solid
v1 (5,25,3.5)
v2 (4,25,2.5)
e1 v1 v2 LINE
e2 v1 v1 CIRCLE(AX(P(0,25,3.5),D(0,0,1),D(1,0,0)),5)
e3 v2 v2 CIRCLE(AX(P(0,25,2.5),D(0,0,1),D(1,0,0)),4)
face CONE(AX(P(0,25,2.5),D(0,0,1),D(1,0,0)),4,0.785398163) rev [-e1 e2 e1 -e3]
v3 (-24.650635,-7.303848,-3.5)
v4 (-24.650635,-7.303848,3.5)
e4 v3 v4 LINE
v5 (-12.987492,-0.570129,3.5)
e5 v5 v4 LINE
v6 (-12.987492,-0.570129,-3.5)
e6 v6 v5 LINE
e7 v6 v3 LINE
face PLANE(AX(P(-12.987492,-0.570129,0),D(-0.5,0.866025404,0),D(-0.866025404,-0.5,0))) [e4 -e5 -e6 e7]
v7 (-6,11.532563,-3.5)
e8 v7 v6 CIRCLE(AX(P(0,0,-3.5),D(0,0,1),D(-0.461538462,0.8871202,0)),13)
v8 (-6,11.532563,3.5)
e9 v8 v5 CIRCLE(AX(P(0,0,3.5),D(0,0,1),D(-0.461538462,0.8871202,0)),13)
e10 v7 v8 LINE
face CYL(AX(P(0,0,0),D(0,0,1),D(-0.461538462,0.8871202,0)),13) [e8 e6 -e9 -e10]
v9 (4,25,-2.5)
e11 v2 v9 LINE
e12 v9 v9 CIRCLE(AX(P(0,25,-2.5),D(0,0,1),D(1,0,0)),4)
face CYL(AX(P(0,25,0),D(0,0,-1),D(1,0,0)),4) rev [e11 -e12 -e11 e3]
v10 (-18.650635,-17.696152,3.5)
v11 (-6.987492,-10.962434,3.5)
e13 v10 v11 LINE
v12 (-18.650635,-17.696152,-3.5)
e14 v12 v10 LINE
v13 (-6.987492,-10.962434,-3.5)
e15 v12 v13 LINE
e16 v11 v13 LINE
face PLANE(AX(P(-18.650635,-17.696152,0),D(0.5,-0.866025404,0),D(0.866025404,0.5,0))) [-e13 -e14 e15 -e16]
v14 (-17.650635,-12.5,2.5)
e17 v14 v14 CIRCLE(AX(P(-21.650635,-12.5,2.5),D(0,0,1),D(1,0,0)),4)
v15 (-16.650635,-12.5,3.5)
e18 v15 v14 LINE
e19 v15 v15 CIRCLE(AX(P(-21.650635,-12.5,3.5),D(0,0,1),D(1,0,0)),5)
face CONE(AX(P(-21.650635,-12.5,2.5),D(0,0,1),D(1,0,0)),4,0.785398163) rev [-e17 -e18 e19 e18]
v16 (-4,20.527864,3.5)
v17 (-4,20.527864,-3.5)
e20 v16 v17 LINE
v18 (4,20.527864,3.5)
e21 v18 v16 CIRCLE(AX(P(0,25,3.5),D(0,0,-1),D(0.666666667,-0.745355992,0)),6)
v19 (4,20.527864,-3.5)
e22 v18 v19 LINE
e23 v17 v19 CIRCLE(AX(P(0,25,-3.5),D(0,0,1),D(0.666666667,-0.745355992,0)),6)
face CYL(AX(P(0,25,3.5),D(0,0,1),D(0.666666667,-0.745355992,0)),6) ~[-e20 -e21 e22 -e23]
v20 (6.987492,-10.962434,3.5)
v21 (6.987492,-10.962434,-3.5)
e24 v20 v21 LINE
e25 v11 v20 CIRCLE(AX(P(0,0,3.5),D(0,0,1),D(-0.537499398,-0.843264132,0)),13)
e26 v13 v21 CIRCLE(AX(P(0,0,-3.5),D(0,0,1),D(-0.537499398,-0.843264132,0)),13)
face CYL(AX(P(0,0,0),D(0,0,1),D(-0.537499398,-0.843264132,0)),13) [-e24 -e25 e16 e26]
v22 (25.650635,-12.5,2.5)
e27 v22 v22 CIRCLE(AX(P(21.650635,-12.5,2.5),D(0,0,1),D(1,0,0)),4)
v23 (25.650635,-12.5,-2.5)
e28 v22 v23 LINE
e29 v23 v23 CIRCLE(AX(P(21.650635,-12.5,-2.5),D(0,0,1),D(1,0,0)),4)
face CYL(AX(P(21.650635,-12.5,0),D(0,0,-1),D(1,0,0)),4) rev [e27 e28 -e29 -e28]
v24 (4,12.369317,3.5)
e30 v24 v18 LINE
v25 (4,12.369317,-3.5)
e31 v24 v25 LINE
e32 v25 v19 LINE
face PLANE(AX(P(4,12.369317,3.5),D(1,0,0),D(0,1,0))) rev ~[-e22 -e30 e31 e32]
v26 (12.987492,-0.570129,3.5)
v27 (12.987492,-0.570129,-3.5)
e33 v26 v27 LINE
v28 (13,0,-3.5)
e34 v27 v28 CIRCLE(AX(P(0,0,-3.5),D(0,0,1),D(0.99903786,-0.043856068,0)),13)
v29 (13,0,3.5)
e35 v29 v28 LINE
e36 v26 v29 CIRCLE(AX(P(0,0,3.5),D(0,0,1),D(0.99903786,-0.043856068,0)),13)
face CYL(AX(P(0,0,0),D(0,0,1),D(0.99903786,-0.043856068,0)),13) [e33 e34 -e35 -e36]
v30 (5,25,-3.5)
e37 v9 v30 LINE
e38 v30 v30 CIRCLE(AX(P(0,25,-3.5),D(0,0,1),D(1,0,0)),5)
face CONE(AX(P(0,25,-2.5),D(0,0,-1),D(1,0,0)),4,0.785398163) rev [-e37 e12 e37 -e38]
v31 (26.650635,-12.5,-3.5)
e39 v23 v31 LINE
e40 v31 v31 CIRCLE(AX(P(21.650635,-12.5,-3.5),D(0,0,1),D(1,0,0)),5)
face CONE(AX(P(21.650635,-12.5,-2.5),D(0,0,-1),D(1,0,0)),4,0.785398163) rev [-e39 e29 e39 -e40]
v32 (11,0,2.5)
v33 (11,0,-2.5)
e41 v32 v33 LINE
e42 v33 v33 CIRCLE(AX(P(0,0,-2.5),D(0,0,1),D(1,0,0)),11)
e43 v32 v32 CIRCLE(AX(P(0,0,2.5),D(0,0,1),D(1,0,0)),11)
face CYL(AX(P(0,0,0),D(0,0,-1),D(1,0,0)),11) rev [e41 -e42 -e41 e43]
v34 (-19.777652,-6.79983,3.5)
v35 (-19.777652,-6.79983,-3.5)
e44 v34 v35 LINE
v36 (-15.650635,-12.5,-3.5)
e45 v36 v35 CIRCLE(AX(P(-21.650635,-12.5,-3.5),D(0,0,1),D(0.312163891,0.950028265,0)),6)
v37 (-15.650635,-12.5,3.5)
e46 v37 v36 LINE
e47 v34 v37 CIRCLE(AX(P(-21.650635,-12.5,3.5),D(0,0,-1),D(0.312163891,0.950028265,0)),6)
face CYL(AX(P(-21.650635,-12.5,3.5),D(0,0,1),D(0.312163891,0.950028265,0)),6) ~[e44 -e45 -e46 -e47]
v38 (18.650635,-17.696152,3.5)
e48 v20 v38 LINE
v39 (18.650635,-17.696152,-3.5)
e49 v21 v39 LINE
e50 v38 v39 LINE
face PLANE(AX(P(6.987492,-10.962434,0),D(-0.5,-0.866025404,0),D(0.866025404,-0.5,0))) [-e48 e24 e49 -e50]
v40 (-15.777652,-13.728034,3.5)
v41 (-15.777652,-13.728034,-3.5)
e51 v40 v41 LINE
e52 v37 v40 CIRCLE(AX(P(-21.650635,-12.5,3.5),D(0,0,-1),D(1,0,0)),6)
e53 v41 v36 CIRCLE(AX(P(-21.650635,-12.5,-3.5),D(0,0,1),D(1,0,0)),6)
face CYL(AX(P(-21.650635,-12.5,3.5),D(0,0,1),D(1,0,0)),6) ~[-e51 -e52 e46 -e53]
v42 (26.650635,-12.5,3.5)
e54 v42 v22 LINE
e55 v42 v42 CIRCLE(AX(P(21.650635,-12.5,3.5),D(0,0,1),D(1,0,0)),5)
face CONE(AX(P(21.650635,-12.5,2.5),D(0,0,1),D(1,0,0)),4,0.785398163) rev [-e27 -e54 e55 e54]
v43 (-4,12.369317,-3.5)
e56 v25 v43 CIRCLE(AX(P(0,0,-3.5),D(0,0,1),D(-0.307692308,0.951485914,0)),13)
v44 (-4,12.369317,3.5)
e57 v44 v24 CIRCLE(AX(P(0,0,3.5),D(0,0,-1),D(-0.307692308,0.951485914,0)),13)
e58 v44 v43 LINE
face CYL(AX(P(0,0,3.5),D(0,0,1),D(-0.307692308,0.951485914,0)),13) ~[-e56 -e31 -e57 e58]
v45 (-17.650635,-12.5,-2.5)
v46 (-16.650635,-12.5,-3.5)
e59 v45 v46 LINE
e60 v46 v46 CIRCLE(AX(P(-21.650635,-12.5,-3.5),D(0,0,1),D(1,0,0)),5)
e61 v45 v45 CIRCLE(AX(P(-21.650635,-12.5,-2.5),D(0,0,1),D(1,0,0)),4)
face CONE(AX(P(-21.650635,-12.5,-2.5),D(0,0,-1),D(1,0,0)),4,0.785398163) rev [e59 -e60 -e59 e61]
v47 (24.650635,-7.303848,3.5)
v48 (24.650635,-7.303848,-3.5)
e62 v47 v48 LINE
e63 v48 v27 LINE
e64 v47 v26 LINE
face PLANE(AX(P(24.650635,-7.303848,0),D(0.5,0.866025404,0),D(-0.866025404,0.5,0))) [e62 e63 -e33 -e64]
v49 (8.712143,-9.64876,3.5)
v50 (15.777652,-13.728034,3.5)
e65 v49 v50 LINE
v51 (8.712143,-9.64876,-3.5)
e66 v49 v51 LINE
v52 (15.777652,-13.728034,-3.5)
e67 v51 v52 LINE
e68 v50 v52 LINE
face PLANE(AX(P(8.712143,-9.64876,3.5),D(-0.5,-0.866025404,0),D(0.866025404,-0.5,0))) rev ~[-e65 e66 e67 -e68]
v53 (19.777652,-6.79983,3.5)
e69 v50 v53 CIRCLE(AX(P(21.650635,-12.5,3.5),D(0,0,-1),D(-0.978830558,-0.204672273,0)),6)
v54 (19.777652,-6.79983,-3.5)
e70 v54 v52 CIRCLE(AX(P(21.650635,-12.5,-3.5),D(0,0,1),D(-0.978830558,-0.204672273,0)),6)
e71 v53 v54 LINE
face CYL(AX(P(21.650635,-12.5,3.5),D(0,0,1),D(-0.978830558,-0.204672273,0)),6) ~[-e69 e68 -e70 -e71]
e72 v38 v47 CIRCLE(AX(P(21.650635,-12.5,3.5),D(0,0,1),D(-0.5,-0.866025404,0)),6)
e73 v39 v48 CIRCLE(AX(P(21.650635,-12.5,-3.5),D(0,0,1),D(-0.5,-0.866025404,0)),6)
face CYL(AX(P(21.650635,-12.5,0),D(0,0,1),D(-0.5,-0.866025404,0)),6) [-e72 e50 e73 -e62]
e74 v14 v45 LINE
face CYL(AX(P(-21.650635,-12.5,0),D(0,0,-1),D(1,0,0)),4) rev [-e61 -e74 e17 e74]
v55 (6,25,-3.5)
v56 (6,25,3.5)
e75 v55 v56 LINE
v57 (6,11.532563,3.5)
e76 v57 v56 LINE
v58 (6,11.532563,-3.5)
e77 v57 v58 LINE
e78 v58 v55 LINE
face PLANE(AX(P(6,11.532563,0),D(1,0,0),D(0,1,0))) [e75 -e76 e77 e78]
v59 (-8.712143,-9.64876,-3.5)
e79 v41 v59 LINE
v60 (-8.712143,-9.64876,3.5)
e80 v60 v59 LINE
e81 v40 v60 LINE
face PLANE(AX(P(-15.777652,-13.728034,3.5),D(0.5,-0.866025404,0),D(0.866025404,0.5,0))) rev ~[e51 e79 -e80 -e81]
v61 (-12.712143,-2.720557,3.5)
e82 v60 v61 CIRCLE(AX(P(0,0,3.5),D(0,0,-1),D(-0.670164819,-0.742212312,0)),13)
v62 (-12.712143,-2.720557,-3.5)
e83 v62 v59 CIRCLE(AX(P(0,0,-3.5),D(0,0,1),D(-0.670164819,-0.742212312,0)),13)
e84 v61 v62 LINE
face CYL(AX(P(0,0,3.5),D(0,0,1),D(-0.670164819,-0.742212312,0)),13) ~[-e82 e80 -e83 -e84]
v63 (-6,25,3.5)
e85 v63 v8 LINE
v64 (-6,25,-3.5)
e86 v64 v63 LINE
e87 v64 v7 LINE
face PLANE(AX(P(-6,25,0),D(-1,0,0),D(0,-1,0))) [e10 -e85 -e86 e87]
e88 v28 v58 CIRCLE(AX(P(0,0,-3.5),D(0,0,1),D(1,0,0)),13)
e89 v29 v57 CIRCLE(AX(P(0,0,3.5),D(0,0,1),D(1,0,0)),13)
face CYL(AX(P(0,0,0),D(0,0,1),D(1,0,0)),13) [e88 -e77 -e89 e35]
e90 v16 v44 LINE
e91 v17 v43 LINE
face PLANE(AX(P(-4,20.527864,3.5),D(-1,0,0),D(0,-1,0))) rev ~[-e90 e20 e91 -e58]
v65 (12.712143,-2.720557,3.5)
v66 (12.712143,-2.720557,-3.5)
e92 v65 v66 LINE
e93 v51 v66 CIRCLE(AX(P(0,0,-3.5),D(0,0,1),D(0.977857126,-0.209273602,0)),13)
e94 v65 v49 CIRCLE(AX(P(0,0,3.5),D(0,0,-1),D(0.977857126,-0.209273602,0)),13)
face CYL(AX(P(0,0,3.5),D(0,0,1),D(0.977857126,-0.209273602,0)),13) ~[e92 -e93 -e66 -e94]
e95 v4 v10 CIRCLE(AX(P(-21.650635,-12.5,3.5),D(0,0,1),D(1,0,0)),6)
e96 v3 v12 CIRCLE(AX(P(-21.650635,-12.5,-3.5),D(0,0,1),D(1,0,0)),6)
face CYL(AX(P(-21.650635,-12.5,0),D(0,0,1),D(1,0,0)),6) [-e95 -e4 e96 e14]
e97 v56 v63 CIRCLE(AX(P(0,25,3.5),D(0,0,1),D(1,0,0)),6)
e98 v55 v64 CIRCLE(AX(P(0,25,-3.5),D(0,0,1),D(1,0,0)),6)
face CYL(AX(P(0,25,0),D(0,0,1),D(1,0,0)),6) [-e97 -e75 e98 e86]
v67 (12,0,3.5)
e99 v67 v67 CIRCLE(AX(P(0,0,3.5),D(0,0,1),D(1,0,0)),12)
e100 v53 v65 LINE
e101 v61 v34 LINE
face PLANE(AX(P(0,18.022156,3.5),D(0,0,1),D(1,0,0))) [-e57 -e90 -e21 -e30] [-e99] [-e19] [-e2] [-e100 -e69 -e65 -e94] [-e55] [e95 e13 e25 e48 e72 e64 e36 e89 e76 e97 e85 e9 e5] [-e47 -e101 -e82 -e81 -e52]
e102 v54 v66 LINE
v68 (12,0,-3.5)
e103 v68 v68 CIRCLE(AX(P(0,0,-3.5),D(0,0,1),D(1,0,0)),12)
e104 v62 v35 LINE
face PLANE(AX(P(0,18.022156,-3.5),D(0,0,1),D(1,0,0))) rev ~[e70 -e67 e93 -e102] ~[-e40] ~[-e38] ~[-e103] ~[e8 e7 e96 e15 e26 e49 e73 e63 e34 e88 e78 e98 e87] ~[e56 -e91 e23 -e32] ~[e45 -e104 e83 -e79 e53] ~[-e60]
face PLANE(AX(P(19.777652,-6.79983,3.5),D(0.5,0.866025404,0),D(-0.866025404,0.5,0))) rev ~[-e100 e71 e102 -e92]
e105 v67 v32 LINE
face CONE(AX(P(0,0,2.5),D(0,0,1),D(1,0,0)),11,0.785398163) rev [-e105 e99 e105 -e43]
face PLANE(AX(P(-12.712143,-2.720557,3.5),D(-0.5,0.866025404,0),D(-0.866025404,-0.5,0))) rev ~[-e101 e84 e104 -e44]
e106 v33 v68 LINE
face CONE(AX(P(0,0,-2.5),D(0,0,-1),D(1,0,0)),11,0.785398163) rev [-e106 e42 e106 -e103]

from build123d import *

# Parameters (mm, degrees)
F0_R     = 11
F0_R_2   = 4
F1_DEPTH = 3.5
F2_SIZE  = 1
F4_DEPTH = 7.001


# Not quite as in the source:
# - a feature names something its author has since deleted; it is built from what else it names


with BuildPart() as f1:
    # F0 (on Top) → F1 (new body, symmetric)
    with BuildSketch(Plane.XY):
        with BuildLine():
            ThreePointArc((-6, 11.5325625947), (0, 13), (6, 11.5325625947))
            Line((6, 11.5325625947), (6, 25))
            ThreePointArc((6, 25), (0, 19), (-6, 25))
            Line((-6, 25), (-6, 11.5325625947))
        make_face()
        with BuildLine():
            ThreePointArc((-6.9874921777, -10.96243372), (-11.2583302492, -6.5), (-12.9874921777, -0.5701288746))
            Line((-12.9874921777, -0.5701288746), (-24.6506350946, -7.3038475773))
            ThreePointArc((-24.6506350946, -7.3038475773), (-18.6506350946, -7.3038475773), (-15.6506350946, -12.5))
            ThreePointArc((-15.6506350946, -12.5), (-16.4544826719, -15.5), (-18.6506350946, -17.6961524227))
            Line((-18.6506350946, -17.6961524227), (-6.9874921777, -10.96243372))
        make_face()
        with BuildLine():
            Line((24.6506350946, -7.3038475773), (12.9874921777, -0.5701288746))
            ThreePointArc((12.9874921777, -0.5701288746), (11.2583302492, -6.5), (6.9874921777, -10.96243372))
            Line((6.9874921777, -10.96243372), (18.6506350946, -17.6961524227))
            ThreePointArc((18.6506350946, -17.6961524227), (16.4544826719, -9.5), (24.6506350946, -7.3038475773))
        make_face()
        with BuildLine():
            ThreePointArc((12.9874921777, -0.5701288746), (12.9968726683, -0.2851330301), (13, 0))
            ThreePointArc((13, 0), (11.1130553854, 6.7453687816), (6, 11.5325625947))
            ThreePointArc((6, 11.5325625947), (0, 13), (-6, 11.5325625947))
            ThreePointArc((-6, 11.5325625947), (-11.2583302492, 6.5), (-12.9874921777, -0.5701288746))
            ThreePointArc((-12.9874921777, -0.5701288746), (-11.2583302492, -6.5), (-6.9874921777, -10.96243372))
            ThreePointArc((-6.9874921777, -10.96243372), (0, -13), (6.9874921777, -10.96243372))
            ThreePointArc((6.9874921777, -10.96243372), (11.2583302492, -6.5), (12.9874921777, -0.5701288746))
        make_face()
        Circle(F0_R, mode=Mode.SUBTRACT)
        with BuildLine():
            ThreePointArc((-6, 25), (0, 19), (6, 25))
            ThreePointArc((6, 25), (0, 31), (-6, 25))
        make_face()
        with Locations((0, 25)):
            Circle(F0_R_2, mode=Mode.SUBTRACT)
        with BuildLine():
            ThreePointArc((-15.6506350946, -12.5), (-18.6506350946, -7.3038475773), (-24.6506350946, -7.3038475773))
            ThreePointArc((-24.6506350946, -7.3038475773), (-26.8467875173, -15.5), (-18.6506350946, -17.6961524227))
            ThreePointArc((-18.6506350946, -17.6961524227), (-16.4544826719, -15.5), (-15.6506350946, -12.5))
        make_face()
        with Locations((-21.6506350946, -12.5)):
            Circle(F0_R_2, mode=Mode.SUBTRACT)
        with BuildLine():
            ThreePointArc((27.6506350946, -12.5), (26.8467875173, -9.5), (24.6506350946, -7.3038475773))
            ThreePointArc((24.6506350946, -7.3038475773), (16.4544826719, -9.5), (18.6506350946, -17.6961524227))
            ThreePointArc((18.6506350946, -17.6961524227), (24.6506350946, -17.6961524227), (27.6506350946, -12.5))
        make_face()
        with Locations((21.6506350946, -12.5)):
            Circle(F0_R_2, mode=Mode.SUBTRACT)
    extrude(amount=F1_DEPTH, both=True)

    # F2
    f2_edges = [f1.edges().sort_by_distance(p)[0] for p in [
        (-4, 25, 3.5),
        (-11, 0, 3.5),
        (-25.650635, -12.5, 3.5),
        (17.650635, -12.5, 3.5),
        (-25.650635, -12.5, -3.5),
        (-11, 0, -3.5),
        (17.650635, -12.5, -3.5),
        (-4, 25, -3.5),
    ]]
    chamfer(f2_edges, length=F2_SIZE)

    # F3 (on face) → F4 (cut, through all)
    with BuildSketch(Plane.XY.offset(3.5)):
        with BuildLine():
            Line((4, 12.3693168769), (4, 20.527864045))
            ThreePointArc((4, 20.527864045), (0, 19), (-4, 20.527864045))
            Line((-4, 20.527864045), (-4, 12.3693168769))
            ThreePointArc((-4, 12.3693168769), (0, 13), (4, 12.3693168769))
        make_face()
        with BuildLine():
            ThreePointArc((-8.7121426428, -9.6487600536), (-11.2583302492, -6.5), (-12.7121426428, -2.7205568233))
            Line((-12.7121426428, -2.7205568233), (-19.7776517484, -6.7998304074))
            ThreePointArc((-19.7776517484, -6.7998304074), (-16.7907019635, -8.9813283811), (-15.6506350946, -12.5))
            ThreePointArc((-15.6506350946, -12.5), (-15.682473733, -13.117292444), (-15.7776517484, -13.7280336376))
            Line((-15.7776517484, -13.7280336376), (-8.7121426428, -9.6487600536))
        make_face()
        with BuildLine():
            Line((19.7776517484, -6.7998304074), (12.7121426428, -2.7205568233))
            ThreePointArc((12.7121426428, -2.7205568233), (11.2583302492, -6.5), (8.7121426428, -9.6487600536))
            Line((8.7121426428, -9.6487600536), (15.7776517484, -13.7280336376))
            ThreePointArc((15.7776517484, -13.7280336376), (16.4544826719, -9.5), (19.7776517484, -6.7998304074))
        make_face()
    extrude(amount=-F4_DEPTH, mode=Mode.SUBTRACT)


solid = f1.part
